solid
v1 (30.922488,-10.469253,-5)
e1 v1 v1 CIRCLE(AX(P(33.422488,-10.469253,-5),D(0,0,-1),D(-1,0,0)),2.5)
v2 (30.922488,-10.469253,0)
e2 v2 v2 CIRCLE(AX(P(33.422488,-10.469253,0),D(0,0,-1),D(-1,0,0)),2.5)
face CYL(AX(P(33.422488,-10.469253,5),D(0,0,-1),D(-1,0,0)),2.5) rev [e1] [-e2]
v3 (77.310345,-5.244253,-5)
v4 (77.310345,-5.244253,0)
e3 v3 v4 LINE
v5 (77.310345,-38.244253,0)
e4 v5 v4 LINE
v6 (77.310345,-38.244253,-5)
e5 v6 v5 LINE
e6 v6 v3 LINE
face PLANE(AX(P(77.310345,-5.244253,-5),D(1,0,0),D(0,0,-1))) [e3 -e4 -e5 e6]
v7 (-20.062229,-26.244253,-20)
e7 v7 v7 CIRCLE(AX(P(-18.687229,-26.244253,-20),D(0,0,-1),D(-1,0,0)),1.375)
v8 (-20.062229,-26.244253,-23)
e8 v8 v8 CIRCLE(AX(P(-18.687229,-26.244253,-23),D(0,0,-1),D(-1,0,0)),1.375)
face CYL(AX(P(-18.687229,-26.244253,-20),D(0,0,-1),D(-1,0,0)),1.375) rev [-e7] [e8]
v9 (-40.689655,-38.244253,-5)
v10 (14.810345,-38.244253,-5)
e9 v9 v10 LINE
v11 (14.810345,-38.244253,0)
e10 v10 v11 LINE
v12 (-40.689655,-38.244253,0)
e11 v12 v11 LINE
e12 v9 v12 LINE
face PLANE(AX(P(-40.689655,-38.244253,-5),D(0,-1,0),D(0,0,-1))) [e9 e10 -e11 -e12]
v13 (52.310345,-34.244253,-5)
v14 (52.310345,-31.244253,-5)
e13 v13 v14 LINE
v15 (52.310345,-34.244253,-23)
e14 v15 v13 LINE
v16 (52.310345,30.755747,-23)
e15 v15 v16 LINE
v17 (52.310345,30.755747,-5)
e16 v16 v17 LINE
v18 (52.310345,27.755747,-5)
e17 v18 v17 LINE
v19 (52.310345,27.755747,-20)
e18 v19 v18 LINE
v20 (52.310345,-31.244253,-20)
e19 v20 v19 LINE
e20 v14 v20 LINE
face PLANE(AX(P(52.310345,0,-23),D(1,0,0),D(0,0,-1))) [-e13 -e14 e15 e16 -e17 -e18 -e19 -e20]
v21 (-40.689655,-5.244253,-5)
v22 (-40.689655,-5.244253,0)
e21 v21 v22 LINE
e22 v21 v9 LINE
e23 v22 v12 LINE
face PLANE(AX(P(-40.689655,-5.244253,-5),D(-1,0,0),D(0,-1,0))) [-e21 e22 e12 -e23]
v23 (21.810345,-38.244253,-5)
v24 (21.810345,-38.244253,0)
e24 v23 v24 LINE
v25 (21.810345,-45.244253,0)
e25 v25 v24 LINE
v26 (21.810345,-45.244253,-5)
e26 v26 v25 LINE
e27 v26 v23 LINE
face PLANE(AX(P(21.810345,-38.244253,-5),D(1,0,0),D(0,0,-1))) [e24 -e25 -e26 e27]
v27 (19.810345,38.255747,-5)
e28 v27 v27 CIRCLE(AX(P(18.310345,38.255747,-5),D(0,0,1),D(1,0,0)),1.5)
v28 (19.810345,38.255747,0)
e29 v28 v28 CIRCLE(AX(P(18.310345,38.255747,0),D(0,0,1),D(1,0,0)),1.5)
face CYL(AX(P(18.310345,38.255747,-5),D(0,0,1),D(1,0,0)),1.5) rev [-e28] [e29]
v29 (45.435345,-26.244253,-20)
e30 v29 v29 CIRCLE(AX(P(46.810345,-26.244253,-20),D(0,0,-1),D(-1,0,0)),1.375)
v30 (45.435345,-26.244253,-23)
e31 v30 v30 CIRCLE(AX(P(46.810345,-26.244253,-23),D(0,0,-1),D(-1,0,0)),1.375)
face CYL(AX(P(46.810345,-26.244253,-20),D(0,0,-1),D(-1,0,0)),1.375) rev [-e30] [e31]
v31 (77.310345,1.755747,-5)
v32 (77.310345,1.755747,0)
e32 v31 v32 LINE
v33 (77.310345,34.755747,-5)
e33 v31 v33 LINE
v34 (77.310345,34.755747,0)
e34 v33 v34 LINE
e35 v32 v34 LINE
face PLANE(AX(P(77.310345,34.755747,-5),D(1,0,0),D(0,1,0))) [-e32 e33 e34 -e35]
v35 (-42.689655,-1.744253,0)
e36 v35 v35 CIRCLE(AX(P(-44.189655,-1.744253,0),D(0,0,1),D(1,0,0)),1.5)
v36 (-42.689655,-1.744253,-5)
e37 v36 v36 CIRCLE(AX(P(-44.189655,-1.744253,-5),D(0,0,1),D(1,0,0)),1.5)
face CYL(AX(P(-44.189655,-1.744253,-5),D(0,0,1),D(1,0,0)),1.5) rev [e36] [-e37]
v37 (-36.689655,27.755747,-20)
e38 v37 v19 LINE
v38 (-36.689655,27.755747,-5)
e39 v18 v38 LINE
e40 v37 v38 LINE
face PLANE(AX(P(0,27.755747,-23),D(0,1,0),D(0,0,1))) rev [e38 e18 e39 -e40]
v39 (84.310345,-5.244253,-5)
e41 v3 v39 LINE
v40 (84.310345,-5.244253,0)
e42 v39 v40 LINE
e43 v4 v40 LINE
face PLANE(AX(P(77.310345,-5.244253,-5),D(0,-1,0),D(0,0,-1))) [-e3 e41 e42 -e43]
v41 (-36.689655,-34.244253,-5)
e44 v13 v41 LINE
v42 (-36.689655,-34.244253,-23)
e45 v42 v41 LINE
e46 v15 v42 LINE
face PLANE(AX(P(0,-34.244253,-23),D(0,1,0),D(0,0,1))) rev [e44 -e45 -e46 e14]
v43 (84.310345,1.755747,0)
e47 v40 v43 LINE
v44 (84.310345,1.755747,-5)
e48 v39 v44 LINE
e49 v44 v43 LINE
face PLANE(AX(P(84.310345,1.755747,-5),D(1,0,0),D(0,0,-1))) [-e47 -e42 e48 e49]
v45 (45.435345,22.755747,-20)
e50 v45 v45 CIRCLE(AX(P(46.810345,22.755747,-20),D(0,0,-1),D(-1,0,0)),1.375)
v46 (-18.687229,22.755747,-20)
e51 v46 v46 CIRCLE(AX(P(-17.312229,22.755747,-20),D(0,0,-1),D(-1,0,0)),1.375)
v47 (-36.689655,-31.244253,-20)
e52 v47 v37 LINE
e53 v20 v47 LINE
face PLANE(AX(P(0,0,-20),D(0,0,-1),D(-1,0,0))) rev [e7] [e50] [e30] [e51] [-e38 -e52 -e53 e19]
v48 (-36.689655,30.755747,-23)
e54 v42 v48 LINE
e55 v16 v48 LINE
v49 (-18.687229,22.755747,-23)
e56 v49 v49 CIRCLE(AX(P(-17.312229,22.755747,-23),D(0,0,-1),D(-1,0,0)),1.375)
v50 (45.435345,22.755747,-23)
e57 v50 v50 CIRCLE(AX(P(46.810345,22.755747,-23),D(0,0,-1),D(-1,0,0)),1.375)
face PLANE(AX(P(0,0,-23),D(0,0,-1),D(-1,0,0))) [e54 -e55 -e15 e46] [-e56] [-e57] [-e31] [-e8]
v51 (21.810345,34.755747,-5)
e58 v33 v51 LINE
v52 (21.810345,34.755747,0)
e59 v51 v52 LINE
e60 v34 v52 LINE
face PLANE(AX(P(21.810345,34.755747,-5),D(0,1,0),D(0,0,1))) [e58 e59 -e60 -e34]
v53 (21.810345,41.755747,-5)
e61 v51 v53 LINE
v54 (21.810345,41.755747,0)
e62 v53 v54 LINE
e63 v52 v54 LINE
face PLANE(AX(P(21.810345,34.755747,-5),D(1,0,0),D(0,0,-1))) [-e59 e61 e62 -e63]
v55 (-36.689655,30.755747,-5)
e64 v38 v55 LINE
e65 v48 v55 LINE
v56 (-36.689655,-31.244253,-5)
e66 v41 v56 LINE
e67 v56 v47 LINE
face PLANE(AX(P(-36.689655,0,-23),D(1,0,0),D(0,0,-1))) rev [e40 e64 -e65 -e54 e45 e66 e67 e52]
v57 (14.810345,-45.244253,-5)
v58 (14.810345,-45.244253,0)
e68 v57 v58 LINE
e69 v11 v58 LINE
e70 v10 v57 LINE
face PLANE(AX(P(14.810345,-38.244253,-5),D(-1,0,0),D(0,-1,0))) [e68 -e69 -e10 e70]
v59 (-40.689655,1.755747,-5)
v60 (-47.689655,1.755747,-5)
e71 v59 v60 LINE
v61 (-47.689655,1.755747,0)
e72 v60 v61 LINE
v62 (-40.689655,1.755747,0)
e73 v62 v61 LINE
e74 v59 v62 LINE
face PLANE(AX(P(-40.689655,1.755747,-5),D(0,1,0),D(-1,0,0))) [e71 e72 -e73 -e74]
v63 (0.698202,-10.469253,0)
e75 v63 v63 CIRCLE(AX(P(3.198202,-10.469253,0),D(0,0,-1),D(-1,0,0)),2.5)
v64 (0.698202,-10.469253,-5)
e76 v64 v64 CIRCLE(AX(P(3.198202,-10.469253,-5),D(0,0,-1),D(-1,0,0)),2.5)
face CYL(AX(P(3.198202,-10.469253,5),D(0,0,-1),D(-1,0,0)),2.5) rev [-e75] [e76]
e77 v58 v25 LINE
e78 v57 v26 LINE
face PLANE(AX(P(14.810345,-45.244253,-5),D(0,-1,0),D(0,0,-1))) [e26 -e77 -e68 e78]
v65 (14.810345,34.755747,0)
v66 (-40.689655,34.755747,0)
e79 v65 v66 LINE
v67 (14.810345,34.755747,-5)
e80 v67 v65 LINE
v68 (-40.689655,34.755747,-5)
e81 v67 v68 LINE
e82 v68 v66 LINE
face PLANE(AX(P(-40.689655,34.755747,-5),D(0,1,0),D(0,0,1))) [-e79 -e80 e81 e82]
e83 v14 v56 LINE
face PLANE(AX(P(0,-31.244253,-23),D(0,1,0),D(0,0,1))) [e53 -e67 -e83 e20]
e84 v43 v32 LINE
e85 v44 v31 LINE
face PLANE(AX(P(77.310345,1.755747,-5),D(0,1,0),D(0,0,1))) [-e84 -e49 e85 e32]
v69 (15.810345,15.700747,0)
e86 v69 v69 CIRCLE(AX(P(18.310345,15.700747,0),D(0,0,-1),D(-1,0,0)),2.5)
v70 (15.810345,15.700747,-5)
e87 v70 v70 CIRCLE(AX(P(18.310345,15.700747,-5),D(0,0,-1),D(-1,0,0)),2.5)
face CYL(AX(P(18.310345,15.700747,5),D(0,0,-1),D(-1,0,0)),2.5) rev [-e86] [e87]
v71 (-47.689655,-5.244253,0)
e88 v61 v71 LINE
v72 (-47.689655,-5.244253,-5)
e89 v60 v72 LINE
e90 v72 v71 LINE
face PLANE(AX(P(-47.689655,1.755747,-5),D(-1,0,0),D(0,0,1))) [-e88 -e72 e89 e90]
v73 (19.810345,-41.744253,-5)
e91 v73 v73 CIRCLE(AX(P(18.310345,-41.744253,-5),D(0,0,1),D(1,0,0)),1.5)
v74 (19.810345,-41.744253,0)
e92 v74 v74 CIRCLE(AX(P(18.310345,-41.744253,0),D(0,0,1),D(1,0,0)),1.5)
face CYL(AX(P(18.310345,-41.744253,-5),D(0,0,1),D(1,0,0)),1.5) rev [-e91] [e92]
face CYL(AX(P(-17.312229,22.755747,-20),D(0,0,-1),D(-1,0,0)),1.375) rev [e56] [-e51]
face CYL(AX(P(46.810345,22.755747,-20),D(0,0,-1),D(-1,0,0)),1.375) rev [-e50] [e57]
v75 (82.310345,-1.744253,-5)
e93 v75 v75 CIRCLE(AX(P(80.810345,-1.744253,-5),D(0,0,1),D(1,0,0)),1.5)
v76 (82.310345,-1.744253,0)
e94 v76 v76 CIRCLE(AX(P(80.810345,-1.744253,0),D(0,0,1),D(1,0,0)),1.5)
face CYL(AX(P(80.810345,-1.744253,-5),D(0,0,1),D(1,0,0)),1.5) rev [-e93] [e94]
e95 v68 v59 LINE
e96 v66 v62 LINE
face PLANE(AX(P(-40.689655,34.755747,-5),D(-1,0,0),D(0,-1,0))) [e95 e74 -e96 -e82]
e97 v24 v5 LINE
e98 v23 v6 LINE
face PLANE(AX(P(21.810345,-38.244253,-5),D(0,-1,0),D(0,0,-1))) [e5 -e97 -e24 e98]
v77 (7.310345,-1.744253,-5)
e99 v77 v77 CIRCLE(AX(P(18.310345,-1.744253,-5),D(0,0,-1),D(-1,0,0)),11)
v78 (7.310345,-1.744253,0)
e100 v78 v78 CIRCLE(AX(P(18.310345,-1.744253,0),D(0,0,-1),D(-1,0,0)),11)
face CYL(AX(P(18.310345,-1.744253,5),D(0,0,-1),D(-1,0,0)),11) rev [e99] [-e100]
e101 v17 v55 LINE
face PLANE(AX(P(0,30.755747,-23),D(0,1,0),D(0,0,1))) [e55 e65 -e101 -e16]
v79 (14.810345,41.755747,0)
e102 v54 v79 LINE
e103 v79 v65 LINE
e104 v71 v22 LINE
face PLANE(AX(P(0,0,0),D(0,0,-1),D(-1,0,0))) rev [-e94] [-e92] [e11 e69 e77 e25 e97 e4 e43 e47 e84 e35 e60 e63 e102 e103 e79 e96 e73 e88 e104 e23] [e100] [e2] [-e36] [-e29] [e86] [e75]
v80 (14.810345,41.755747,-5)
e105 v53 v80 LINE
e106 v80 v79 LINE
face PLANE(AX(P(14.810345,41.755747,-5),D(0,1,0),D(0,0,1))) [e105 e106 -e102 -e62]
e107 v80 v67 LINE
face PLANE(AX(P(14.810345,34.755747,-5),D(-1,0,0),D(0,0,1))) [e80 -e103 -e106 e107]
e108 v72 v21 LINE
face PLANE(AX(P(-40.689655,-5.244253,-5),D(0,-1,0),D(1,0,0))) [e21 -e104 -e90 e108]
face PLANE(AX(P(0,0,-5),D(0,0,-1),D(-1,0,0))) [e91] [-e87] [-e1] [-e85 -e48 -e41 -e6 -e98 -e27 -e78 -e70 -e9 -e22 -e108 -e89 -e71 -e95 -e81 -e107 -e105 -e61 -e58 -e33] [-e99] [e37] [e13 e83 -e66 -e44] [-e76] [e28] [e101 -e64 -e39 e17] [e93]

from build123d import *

# Parameters (mm, degrees)
CROQUIS1_R                  = 1.5
SALIENTE_EXTRUIR1_DEPTH     = 5
CROQUIS3_R                  = 11
CROQUIS3_R_2                = 2.5
CORTAR_EXTRUIR1_DEPTH       = 10
CROQUIS4_W                  = 89
CROQUIS4_H                  = 65
CROQUIS4_W_2                = 83
CROQUIS4_H_2                = 59
SALIENTE_EXTRUIR3_DEPTH     = 18
CROQUIS5_W                  = 83
CROQUIS5_H                  = 59
CROQUIS5_R                  = 1.375
SALIENTE_EXTRUIR4_DEPTH     = 3
SALIENTE_EXTRUIR5_START     = -89
SALIENTE_EXTRUIR5_OUTLINE_W = 15
SALIENTE_EXTRUIR5_OUTLINE_H = 59
SALIENTE_EXTRUIR5_DEPTH     = 89


# Read off the part's stored shape, not the designer's step: Saliente-Extruir5
with BuildPart() as part:
    # Croquis1 → Saliente-Extruir1 (new body)
    with BuildSketch(Plane.XY):
        Polygon((-40.689655172, 34.755747126), (14.810344828, 34.755747126), (14.810344828, 41.755747126), (21.810344828, 41.755747126), (21.810344828, 34.755747126), (77.310344828, 34.755747126), (77.310344828, 1.755747126), (84.310344828, 1.755747126), (84.310344828, -5.244252874), (77.310344828, -5.244252874), (77.310344828, -38.244252874), (21.810344828, -38.244252874), (21.810344828, -45.244252874), (14.810344828, -45.244252874), (14.810344828, -38.244252874), (-40.689655172, -38.244252874), (-40.689655172, -5.244252874), (-47.689655172, -5.244252874), (-47.689655172, 1.755747126), (-40.689655172, 1.755747126), align=None)
        with Locations((18.310344828, 38.255747126)):
            Circle(CROQUIS1_R, mode=Mode.SUBTRACT)
        with Locations((-44.189655172, -1.744252874)):
            Circle(CROQUIS1_R, mode=Mode.SUBTRACT)
        with Locations((80.810344828, -1.744252874)):
            Circle(CROQUIS1_R, mode=Mode.SUBTRACT)
        with Locations((18.310344828, -41.744252874)):
            Circle(CROQUIS1_R, mode=Mode.SUBTRACT)
    extrude(amount=-SALIENTE_EXTRUIR1_DEPTH)

    # Croquis3 → Cortar-Extruir1 (cut)
    with BuildSketch(Plane(origin=(0, 0, -5), x_dir=(-1, 0, 0), z_dir=(0, 0, -1))):
        with Locations((-18.310344828, -1.744252874)):
            Circle(CROQUIS3_R)
        with Locations((-18.310344828, 15.700747126)):
            Circle(CROQUIS3_R_2)
        with Locations((-3.198201532, -10.469252874)):
            Circle(CROQUIS3_R_2)
        with Locations((-33.422488124, -10.469252874)):
            Circle(CROQUIS3_R_2)
    extrude(amount=-CORTAR_EXTRUIR1_DEPTH, mode=Mode.SUBTRACT)

    # Croquis4 → Saliente-Extruir3 (add)
    with BuildSketch(Plane(origin=(0, 0, -5), x_dir=(-1, 0, 0), z_dir=(0, 0, -1))):
        with Locations((-7.810344828, -1.744252874)):
            Rectangle(CROQUIS4_W, CROQUIS4_H)
        with Locations((-7.810344828, -1.744252874)):
            Rectangle(CROQUIS4_W_2, CROQUIS4_H_2, mode=Mode.SUBTRACT)
    extrude(amount=SALIENTE_EXTRUIR3_DEPTH)

    # Croquis5 → Saliente-Extruir4 (add)
    with BuildSketch(Plane(origin=(0, 0, -23), x_dir=(-1, 0, 0), z_dir=(0, 0, -1))):
        with Locations((-7.810344828, -1.744252874)):
            Rectangle(CROQUIS5_W, CROQUIS5_H)
        with Locations((-46.810344828, 22.755747126)):
            Circle(CROQUIS5_R, mode=Mode.SUBTRACT)
        with Locations((-46.810344828, -26.244252874)):
            Circle(CROQUIS5_R, mode=Mode.SUBTRACT)
        with Locations((17.312228898, 22.755747126)):
            Circle(CROQUIS5_R, mode=Mode.SUBTRACT)
        with Locations((18.687228898, -26.244252874)):
            Circle(CROQUIS5_R, mode=Mode.SUBTRACT)
    extrude(amount=-SALIENTE_EXTRUIR4_DEPTH)

    # Saliente-Extruir5 outline → Saliente-Extruir5 (cut)
    with BuildSketch(Plane(origin=(52.310344828, 0, 0), x_dir=(0, 0, -1), z_dir=(1, 0, 0)).offset(SALIENTE_EXTRUIR5_START)):
        with Locations((12.5, -1.744252874)):
            Rectangle(SALIENTE_EXTRUIR5_OUTLINE_W, SALIENTE_EXTRUIR5_OUTLINE_H)
    extrude(amount=SALIENTE_EXTRUIR5_DEPTH, mode=Mode.SUBTRACT)


solid = part.part
